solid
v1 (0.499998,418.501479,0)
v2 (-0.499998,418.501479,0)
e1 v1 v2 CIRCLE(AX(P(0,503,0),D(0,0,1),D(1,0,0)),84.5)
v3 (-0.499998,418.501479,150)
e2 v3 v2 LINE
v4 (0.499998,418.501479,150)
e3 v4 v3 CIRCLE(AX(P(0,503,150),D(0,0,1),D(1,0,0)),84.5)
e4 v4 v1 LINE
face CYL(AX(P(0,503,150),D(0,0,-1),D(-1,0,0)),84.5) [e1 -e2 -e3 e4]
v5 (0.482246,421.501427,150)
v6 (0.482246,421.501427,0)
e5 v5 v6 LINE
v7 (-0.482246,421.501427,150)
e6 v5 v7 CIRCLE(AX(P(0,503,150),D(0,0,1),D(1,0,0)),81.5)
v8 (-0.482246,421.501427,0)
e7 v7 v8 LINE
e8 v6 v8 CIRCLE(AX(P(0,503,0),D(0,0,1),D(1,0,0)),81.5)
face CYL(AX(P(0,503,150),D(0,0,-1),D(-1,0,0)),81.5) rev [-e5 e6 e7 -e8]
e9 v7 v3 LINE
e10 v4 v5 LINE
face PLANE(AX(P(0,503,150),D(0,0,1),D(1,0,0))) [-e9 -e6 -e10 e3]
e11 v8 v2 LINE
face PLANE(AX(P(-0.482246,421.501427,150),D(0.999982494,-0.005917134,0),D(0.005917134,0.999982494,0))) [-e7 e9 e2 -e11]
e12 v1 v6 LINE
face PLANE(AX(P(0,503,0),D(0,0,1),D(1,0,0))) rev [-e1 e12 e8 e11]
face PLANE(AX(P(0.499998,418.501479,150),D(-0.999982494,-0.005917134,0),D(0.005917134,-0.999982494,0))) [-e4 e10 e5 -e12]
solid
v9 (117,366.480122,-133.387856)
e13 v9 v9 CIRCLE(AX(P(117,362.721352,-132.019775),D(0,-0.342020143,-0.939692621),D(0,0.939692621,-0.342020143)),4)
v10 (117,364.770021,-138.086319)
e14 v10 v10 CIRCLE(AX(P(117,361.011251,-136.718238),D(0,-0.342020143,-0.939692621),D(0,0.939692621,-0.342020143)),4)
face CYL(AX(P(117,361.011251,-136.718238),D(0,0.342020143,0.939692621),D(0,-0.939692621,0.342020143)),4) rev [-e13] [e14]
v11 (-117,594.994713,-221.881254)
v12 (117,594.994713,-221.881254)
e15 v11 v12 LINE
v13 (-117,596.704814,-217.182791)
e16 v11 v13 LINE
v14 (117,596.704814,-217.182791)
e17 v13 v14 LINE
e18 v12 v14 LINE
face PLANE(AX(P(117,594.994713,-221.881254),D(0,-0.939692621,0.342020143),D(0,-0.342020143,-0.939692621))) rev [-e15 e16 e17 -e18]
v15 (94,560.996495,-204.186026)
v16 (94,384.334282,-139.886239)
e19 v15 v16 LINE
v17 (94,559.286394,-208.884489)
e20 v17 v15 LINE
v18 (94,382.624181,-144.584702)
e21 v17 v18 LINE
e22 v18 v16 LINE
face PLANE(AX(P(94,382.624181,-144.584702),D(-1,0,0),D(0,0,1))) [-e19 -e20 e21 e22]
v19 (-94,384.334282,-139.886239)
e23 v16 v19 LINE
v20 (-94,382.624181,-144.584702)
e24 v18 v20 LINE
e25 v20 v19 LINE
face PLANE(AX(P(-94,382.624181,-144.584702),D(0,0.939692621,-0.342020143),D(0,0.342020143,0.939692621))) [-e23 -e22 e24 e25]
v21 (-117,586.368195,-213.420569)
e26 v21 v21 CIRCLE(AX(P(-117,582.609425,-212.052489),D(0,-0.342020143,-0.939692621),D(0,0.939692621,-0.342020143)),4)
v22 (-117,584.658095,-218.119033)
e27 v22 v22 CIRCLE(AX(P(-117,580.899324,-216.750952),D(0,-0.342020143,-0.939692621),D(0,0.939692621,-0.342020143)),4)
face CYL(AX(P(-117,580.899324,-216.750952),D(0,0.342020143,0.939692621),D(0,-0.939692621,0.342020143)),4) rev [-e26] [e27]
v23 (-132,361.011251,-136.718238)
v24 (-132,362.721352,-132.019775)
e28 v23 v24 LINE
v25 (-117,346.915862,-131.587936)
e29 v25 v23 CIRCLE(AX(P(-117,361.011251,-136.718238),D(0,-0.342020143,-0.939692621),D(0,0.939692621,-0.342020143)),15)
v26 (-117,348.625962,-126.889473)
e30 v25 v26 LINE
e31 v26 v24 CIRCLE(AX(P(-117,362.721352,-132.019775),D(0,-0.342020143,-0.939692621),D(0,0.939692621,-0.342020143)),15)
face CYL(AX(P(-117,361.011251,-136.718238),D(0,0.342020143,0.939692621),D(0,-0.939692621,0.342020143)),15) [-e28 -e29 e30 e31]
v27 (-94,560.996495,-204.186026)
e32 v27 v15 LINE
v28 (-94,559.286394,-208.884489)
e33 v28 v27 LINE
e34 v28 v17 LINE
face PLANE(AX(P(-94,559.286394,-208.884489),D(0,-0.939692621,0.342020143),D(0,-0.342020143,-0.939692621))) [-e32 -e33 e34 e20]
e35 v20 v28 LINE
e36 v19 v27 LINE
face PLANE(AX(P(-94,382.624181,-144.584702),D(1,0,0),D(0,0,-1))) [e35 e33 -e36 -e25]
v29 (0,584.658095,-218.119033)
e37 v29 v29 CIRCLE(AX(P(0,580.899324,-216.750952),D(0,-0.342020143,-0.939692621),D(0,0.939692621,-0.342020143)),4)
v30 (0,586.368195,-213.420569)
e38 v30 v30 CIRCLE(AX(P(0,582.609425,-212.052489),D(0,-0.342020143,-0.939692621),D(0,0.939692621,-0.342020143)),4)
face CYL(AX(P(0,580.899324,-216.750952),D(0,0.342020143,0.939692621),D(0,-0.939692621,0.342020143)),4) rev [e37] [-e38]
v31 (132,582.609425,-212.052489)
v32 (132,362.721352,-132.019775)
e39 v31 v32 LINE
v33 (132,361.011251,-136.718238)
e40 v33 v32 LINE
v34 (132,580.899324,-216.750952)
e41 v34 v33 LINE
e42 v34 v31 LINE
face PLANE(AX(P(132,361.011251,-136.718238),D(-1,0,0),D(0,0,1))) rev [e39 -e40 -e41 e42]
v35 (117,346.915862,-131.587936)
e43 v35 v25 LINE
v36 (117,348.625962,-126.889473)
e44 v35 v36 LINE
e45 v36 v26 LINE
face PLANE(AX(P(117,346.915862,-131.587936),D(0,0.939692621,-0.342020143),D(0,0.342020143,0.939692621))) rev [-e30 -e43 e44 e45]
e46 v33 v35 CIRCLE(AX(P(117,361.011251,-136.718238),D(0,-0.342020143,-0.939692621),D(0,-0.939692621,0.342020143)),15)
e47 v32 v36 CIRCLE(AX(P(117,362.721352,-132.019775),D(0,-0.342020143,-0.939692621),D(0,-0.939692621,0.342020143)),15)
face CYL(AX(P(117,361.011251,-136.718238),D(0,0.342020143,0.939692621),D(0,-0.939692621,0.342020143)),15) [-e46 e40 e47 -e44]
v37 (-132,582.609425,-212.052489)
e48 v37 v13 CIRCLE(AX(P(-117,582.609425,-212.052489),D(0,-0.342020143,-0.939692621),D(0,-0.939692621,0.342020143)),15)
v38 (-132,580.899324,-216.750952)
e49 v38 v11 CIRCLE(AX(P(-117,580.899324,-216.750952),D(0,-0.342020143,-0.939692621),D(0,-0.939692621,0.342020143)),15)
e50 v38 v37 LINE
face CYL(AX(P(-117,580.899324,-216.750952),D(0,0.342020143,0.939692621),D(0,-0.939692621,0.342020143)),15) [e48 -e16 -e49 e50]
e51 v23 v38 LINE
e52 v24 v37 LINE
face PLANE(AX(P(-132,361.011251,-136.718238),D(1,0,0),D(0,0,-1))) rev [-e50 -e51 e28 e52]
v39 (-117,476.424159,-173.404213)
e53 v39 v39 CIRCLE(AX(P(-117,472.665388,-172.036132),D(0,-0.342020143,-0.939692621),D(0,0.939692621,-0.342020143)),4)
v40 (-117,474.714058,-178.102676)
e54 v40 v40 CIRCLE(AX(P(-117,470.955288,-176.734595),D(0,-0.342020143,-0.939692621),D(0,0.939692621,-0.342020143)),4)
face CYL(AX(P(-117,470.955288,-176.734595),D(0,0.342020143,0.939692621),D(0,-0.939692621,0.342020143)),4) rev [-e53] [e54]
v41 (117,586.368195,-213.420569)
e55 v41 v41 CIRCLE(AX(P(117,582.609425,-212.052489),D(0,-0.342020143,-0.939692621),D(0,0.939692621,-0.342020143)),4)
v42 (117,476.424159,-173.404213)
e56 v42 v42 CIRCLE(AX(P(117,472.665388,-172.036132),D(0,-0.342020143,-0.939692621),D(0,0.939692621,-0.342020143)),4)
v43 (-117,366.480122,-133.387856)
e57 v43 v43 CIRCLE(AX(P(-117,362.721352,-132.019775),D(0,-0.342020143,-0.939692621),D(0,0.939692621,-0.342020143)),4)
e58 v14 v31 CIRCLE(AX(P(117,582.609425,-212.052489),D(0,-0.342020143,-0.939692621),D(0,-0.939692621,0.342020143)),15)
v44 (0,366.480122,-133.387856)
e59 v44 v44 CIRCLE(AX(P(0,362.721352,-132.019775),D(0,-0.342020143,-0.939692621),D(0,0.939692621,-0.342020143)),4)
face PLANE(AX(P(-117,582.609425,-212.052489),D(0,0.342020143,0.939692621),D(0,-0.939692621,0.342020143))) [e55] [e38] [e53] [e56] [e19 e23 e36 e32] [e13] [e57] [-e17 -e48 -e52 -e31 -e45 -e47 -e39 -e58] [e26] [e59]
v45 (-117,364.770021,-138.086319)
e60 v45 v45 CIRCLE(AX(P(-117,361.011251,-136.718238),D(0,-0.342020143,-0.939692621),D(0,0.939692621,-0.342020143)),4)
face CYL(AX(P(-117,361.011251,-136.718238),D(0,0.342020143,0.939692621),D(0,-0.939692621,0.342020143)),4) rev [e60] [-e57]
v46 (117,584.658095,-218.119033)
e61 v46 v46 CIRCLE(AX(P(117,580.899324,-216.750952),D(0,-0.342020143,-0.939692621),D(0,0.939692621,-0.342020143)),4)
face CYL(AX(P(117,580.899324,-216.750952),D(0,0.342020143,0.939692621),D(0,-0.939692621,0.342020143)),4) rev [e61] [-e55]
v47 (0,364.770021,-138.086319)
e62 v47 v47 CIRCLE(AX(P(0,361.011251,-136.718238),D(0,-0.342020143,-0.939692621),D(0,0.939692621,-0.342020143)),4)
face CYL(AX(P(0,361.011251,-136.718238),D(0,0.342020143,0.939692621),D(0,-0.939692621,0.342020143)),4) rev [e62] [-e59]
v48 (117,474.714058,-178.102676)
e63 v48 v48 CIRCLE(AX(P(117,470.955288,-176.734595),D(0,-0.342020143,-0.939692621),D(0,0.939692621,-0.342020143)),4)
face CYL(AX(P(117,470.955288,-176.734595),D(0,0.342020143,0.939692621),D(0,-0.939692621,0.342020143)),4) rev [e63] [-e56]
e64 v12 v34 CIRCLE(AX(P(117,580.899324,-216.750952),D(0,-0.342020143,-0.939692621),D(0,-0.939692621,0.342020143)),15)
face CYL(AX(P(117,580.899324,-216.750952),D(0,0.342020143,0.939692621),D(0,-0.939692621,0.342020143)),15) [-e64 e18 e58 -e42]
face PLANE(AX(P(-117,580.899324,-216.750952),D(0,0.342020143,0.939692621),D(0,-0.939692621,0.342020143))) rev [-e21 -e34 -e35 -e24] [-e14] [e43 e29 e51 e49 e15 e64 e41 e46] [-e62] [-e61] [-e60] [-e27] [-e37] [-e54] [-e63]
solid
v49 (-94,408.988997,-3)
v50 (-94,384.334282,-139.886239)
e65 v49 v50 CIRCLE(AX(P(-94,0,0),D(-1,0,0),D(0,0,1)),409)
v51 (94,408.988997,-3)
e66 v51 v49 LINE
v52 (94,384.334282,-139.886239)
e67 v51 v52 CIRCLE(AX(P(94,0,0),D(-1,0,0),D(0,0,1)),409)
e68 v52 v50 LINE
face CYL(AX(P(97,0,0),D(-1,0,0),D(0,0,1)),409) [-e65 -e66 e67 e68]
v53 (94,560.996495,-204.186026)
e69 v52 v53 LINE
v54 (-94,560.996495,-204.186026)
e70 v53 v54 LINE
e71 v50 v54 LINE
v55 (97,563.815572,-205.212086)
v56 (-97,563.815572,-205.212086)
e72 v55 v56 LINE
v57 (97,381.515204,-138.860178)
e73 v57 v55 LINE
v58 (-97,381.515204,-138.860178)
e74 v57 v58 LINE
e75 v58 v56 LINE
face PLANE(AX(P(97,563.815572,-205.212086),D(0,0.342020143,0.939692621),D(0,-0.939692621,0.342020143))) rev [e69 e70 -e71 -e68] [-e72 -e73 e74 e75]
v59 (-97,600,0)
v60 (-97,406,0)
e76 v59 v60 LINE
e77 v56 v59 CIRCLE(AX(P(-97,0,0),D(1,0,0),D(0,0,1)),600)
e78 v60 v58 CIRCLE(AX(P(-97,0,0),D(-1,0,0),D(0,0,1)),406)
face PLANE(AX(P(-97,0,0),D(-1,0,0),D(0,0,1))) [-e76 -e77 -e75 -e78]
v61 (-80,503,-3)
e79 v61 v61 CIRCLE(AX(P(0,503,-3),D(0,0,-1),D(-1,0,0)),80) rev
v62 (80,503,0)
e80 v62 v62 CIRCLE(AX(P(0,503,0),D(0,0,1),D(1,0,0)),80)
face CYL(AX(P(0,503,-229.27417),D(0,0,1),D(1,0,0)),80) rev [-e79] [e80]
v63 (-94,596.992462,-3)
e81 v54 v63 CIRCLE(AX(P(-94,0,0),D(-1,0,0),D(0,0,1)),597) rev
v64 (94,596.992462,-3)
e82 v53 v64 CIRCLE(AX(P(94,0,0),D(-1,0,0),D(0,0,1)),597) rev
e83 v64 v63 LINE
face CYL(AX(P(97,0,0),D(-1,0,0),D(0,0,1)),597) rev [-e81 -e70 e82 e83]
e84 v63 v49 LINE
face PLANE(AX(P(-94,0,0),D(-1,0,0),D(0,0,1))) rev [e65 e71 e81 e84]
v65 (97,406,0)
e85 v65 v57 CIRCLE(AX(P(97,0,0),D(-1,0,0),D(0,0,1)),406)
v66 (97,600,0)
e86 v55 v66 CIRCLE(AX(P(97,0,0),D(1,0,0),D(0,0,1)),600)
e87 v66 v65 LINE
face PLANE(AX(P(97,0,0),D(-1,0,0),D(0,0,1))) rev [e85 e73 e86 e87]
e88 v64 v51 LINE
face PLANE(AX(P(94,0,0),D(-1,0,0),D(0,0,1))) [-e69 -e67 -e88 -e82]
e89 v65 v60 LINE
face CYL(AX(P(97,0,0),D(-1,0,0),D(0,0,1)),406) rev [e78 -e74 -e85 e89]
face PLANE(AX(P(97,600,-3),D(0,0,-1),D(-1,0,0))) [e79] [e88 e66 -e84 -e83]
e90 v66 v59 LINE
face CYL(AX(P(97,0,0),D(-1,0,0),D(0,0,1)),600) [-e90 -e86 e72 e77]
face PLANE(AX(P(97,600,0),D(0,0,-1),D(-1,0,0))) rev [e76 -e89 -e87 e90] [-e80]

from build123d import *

# Parameters (mm, degrees)
BOSS_EXTRUDE1_DEPTH = 97
SHELL2_T            = -3
SKETCH2_R           = 80
CUT_EXTRUDE1_DEPTH  = 3
BASE_FLANGE1_DEPTH  = 150
SKETCH8_R           = 4
SKETCH8_W           = 188
SKETCH8_H           = 188
BOSS_EXTRUDE2_DEPTH = 5


# Sheet-metal steps are written as plain solids
with BuildPart() as part:
    # Sketch1 → Boss-Extrude1 (new, symmetric)
    with BuildSketch(Plane(origin=(0, 0, 0), x_dir=(0, 0, -1), z_dir=(1, 0, 0))):
        with BuildLine():
            Line((0, 600), (0, 406))
            ThreePointArc((0, 406), (70.501160133, 399.831947723), (138.86017819, 381.515204039))
            Line((138.86017819, 381.515204039), (205.212085995, 563.815572472))
            ThreePointArc((205.212085995, 563.815572472), (104.1889066, 590.884651807), (0, 600))
        make_face()
    extrude(amount=BOSS_EXTRUDE1_DEPTH, both=True)

    # Shell2
    shell2_openings = [part.faces().sort_by_distance(p)[0] for p in [
        (0, 472.665388255, -172.036132093),
    ]]
    offset(amount=SHELL2_T, openings=shell2_openings, kind=Kind.INTERSECTION)

    # Sketch2 → Cut-Extrude1 (cut)
    with BuildSketch(Plane.XY):
        with Locations((0, 503)):
            Circle(SKETCH2_R)
    extrude(amount=-CUT_EXTRUDE1_DEPTH, mode=Mode.SUBTRACT)


with BuildPart() as body_2:
    # Sketch3 → Base-Flange1 (new body)
    with BuildSketch(Plane.XY):
        with BuildLine():
            ThreePointArc((0.499997812, 418.50147929), (0, 587.5), (-0.499997812, 418.50147929))
            Line((-0.499997812, 418.50147929), (-0.48224641, 421.501426771))
            ThreePointArc((-0.48224641, 421.501426771), (0, 584.5), (0.48224641, 421.501426771))
            Line((0.48224641, 421.501426771), (0.499997812, 418.50147929))
        make_face()
    extrude(amount=BASE_FLANGE1_DEPTH)


with BuildPart() as body_3:
    # Sketch8 → Boss-Extrude2 (new body)
    with BuildSketch(Plane(origin=(0, 0, 0), x_dir=(-1, 0, 0), z_dir=(0, -0.3420201433256697, -0.939692620785908))):
        with BuildLine():
            Line((-117, 371), (117, 371))
            ThreePointArc((117, 371), (127.606601718, 375.393398282), (132, 386))
            Line((132, 386), (132, 620))
            ThreePointArc((132, 620), (127.606601718, 630.606601718), (117, 635))
            Line((117, 635), (-117, 635))
            ThreePointArc((-117, 635), (-127.606601718, 630.606601718), (-132, 620))
            Line((-132, 620), (-132, 386))
            ThreePointArc((-132, 386), (-127.606601718, 375.393398282), (-117, 371))
        make_face()
        with Locations(Location((-117, 620, 0), (0, 0, 90))):
            Circle(SKETCH8_R, mode=Mode.SUBTRACT)
        with Locations(Location((0, 620, 0), (0, 0, 90))):
            Circle(SKETCH8_R, mode=Mode.SUBTRACT)
        with Locations(Location((117, 620, 0), (0, 0, 90))):
            Circle(SKETCH8_R, mode=Mode.SUBTRACT)
        with Locations(Location((117, 503, 0), (0, 0, 90))):
            Circle(SKETCH8_R, mode=Mode.SUBTRACT)
        with Locations(Location((117, 386, 0), (0, 0, 90))):
            Circle(SKETCH8_R, mode=Mode.SUBTRACT)
        with Locations(Location((0, 386, 0), (0, 0, 90))):
            Circle(SKETCH8_R, mode=Mode.SUBTRACT)
        with Locations(Location((-117, 386, 0), (0, 0, 90))):
            Circle(SKETCH8_R, mode=Mode.SUBTRACT)
        with Locations(Location((-117, 503, 0), (0, 0, 90))):
            Circle(SKETCH8_R, mode=Mode.SUBTRACT)
        with Locations((0, 503)):
            Rectangle(SKETCH8_W, SKETCH8_H, mode=Mode.SUBTRACT)
    extrude(amount=BOSS_EXTRUDE2_DEPTH)


solid = Compound([part.part, body_2.part, body_3.part])
